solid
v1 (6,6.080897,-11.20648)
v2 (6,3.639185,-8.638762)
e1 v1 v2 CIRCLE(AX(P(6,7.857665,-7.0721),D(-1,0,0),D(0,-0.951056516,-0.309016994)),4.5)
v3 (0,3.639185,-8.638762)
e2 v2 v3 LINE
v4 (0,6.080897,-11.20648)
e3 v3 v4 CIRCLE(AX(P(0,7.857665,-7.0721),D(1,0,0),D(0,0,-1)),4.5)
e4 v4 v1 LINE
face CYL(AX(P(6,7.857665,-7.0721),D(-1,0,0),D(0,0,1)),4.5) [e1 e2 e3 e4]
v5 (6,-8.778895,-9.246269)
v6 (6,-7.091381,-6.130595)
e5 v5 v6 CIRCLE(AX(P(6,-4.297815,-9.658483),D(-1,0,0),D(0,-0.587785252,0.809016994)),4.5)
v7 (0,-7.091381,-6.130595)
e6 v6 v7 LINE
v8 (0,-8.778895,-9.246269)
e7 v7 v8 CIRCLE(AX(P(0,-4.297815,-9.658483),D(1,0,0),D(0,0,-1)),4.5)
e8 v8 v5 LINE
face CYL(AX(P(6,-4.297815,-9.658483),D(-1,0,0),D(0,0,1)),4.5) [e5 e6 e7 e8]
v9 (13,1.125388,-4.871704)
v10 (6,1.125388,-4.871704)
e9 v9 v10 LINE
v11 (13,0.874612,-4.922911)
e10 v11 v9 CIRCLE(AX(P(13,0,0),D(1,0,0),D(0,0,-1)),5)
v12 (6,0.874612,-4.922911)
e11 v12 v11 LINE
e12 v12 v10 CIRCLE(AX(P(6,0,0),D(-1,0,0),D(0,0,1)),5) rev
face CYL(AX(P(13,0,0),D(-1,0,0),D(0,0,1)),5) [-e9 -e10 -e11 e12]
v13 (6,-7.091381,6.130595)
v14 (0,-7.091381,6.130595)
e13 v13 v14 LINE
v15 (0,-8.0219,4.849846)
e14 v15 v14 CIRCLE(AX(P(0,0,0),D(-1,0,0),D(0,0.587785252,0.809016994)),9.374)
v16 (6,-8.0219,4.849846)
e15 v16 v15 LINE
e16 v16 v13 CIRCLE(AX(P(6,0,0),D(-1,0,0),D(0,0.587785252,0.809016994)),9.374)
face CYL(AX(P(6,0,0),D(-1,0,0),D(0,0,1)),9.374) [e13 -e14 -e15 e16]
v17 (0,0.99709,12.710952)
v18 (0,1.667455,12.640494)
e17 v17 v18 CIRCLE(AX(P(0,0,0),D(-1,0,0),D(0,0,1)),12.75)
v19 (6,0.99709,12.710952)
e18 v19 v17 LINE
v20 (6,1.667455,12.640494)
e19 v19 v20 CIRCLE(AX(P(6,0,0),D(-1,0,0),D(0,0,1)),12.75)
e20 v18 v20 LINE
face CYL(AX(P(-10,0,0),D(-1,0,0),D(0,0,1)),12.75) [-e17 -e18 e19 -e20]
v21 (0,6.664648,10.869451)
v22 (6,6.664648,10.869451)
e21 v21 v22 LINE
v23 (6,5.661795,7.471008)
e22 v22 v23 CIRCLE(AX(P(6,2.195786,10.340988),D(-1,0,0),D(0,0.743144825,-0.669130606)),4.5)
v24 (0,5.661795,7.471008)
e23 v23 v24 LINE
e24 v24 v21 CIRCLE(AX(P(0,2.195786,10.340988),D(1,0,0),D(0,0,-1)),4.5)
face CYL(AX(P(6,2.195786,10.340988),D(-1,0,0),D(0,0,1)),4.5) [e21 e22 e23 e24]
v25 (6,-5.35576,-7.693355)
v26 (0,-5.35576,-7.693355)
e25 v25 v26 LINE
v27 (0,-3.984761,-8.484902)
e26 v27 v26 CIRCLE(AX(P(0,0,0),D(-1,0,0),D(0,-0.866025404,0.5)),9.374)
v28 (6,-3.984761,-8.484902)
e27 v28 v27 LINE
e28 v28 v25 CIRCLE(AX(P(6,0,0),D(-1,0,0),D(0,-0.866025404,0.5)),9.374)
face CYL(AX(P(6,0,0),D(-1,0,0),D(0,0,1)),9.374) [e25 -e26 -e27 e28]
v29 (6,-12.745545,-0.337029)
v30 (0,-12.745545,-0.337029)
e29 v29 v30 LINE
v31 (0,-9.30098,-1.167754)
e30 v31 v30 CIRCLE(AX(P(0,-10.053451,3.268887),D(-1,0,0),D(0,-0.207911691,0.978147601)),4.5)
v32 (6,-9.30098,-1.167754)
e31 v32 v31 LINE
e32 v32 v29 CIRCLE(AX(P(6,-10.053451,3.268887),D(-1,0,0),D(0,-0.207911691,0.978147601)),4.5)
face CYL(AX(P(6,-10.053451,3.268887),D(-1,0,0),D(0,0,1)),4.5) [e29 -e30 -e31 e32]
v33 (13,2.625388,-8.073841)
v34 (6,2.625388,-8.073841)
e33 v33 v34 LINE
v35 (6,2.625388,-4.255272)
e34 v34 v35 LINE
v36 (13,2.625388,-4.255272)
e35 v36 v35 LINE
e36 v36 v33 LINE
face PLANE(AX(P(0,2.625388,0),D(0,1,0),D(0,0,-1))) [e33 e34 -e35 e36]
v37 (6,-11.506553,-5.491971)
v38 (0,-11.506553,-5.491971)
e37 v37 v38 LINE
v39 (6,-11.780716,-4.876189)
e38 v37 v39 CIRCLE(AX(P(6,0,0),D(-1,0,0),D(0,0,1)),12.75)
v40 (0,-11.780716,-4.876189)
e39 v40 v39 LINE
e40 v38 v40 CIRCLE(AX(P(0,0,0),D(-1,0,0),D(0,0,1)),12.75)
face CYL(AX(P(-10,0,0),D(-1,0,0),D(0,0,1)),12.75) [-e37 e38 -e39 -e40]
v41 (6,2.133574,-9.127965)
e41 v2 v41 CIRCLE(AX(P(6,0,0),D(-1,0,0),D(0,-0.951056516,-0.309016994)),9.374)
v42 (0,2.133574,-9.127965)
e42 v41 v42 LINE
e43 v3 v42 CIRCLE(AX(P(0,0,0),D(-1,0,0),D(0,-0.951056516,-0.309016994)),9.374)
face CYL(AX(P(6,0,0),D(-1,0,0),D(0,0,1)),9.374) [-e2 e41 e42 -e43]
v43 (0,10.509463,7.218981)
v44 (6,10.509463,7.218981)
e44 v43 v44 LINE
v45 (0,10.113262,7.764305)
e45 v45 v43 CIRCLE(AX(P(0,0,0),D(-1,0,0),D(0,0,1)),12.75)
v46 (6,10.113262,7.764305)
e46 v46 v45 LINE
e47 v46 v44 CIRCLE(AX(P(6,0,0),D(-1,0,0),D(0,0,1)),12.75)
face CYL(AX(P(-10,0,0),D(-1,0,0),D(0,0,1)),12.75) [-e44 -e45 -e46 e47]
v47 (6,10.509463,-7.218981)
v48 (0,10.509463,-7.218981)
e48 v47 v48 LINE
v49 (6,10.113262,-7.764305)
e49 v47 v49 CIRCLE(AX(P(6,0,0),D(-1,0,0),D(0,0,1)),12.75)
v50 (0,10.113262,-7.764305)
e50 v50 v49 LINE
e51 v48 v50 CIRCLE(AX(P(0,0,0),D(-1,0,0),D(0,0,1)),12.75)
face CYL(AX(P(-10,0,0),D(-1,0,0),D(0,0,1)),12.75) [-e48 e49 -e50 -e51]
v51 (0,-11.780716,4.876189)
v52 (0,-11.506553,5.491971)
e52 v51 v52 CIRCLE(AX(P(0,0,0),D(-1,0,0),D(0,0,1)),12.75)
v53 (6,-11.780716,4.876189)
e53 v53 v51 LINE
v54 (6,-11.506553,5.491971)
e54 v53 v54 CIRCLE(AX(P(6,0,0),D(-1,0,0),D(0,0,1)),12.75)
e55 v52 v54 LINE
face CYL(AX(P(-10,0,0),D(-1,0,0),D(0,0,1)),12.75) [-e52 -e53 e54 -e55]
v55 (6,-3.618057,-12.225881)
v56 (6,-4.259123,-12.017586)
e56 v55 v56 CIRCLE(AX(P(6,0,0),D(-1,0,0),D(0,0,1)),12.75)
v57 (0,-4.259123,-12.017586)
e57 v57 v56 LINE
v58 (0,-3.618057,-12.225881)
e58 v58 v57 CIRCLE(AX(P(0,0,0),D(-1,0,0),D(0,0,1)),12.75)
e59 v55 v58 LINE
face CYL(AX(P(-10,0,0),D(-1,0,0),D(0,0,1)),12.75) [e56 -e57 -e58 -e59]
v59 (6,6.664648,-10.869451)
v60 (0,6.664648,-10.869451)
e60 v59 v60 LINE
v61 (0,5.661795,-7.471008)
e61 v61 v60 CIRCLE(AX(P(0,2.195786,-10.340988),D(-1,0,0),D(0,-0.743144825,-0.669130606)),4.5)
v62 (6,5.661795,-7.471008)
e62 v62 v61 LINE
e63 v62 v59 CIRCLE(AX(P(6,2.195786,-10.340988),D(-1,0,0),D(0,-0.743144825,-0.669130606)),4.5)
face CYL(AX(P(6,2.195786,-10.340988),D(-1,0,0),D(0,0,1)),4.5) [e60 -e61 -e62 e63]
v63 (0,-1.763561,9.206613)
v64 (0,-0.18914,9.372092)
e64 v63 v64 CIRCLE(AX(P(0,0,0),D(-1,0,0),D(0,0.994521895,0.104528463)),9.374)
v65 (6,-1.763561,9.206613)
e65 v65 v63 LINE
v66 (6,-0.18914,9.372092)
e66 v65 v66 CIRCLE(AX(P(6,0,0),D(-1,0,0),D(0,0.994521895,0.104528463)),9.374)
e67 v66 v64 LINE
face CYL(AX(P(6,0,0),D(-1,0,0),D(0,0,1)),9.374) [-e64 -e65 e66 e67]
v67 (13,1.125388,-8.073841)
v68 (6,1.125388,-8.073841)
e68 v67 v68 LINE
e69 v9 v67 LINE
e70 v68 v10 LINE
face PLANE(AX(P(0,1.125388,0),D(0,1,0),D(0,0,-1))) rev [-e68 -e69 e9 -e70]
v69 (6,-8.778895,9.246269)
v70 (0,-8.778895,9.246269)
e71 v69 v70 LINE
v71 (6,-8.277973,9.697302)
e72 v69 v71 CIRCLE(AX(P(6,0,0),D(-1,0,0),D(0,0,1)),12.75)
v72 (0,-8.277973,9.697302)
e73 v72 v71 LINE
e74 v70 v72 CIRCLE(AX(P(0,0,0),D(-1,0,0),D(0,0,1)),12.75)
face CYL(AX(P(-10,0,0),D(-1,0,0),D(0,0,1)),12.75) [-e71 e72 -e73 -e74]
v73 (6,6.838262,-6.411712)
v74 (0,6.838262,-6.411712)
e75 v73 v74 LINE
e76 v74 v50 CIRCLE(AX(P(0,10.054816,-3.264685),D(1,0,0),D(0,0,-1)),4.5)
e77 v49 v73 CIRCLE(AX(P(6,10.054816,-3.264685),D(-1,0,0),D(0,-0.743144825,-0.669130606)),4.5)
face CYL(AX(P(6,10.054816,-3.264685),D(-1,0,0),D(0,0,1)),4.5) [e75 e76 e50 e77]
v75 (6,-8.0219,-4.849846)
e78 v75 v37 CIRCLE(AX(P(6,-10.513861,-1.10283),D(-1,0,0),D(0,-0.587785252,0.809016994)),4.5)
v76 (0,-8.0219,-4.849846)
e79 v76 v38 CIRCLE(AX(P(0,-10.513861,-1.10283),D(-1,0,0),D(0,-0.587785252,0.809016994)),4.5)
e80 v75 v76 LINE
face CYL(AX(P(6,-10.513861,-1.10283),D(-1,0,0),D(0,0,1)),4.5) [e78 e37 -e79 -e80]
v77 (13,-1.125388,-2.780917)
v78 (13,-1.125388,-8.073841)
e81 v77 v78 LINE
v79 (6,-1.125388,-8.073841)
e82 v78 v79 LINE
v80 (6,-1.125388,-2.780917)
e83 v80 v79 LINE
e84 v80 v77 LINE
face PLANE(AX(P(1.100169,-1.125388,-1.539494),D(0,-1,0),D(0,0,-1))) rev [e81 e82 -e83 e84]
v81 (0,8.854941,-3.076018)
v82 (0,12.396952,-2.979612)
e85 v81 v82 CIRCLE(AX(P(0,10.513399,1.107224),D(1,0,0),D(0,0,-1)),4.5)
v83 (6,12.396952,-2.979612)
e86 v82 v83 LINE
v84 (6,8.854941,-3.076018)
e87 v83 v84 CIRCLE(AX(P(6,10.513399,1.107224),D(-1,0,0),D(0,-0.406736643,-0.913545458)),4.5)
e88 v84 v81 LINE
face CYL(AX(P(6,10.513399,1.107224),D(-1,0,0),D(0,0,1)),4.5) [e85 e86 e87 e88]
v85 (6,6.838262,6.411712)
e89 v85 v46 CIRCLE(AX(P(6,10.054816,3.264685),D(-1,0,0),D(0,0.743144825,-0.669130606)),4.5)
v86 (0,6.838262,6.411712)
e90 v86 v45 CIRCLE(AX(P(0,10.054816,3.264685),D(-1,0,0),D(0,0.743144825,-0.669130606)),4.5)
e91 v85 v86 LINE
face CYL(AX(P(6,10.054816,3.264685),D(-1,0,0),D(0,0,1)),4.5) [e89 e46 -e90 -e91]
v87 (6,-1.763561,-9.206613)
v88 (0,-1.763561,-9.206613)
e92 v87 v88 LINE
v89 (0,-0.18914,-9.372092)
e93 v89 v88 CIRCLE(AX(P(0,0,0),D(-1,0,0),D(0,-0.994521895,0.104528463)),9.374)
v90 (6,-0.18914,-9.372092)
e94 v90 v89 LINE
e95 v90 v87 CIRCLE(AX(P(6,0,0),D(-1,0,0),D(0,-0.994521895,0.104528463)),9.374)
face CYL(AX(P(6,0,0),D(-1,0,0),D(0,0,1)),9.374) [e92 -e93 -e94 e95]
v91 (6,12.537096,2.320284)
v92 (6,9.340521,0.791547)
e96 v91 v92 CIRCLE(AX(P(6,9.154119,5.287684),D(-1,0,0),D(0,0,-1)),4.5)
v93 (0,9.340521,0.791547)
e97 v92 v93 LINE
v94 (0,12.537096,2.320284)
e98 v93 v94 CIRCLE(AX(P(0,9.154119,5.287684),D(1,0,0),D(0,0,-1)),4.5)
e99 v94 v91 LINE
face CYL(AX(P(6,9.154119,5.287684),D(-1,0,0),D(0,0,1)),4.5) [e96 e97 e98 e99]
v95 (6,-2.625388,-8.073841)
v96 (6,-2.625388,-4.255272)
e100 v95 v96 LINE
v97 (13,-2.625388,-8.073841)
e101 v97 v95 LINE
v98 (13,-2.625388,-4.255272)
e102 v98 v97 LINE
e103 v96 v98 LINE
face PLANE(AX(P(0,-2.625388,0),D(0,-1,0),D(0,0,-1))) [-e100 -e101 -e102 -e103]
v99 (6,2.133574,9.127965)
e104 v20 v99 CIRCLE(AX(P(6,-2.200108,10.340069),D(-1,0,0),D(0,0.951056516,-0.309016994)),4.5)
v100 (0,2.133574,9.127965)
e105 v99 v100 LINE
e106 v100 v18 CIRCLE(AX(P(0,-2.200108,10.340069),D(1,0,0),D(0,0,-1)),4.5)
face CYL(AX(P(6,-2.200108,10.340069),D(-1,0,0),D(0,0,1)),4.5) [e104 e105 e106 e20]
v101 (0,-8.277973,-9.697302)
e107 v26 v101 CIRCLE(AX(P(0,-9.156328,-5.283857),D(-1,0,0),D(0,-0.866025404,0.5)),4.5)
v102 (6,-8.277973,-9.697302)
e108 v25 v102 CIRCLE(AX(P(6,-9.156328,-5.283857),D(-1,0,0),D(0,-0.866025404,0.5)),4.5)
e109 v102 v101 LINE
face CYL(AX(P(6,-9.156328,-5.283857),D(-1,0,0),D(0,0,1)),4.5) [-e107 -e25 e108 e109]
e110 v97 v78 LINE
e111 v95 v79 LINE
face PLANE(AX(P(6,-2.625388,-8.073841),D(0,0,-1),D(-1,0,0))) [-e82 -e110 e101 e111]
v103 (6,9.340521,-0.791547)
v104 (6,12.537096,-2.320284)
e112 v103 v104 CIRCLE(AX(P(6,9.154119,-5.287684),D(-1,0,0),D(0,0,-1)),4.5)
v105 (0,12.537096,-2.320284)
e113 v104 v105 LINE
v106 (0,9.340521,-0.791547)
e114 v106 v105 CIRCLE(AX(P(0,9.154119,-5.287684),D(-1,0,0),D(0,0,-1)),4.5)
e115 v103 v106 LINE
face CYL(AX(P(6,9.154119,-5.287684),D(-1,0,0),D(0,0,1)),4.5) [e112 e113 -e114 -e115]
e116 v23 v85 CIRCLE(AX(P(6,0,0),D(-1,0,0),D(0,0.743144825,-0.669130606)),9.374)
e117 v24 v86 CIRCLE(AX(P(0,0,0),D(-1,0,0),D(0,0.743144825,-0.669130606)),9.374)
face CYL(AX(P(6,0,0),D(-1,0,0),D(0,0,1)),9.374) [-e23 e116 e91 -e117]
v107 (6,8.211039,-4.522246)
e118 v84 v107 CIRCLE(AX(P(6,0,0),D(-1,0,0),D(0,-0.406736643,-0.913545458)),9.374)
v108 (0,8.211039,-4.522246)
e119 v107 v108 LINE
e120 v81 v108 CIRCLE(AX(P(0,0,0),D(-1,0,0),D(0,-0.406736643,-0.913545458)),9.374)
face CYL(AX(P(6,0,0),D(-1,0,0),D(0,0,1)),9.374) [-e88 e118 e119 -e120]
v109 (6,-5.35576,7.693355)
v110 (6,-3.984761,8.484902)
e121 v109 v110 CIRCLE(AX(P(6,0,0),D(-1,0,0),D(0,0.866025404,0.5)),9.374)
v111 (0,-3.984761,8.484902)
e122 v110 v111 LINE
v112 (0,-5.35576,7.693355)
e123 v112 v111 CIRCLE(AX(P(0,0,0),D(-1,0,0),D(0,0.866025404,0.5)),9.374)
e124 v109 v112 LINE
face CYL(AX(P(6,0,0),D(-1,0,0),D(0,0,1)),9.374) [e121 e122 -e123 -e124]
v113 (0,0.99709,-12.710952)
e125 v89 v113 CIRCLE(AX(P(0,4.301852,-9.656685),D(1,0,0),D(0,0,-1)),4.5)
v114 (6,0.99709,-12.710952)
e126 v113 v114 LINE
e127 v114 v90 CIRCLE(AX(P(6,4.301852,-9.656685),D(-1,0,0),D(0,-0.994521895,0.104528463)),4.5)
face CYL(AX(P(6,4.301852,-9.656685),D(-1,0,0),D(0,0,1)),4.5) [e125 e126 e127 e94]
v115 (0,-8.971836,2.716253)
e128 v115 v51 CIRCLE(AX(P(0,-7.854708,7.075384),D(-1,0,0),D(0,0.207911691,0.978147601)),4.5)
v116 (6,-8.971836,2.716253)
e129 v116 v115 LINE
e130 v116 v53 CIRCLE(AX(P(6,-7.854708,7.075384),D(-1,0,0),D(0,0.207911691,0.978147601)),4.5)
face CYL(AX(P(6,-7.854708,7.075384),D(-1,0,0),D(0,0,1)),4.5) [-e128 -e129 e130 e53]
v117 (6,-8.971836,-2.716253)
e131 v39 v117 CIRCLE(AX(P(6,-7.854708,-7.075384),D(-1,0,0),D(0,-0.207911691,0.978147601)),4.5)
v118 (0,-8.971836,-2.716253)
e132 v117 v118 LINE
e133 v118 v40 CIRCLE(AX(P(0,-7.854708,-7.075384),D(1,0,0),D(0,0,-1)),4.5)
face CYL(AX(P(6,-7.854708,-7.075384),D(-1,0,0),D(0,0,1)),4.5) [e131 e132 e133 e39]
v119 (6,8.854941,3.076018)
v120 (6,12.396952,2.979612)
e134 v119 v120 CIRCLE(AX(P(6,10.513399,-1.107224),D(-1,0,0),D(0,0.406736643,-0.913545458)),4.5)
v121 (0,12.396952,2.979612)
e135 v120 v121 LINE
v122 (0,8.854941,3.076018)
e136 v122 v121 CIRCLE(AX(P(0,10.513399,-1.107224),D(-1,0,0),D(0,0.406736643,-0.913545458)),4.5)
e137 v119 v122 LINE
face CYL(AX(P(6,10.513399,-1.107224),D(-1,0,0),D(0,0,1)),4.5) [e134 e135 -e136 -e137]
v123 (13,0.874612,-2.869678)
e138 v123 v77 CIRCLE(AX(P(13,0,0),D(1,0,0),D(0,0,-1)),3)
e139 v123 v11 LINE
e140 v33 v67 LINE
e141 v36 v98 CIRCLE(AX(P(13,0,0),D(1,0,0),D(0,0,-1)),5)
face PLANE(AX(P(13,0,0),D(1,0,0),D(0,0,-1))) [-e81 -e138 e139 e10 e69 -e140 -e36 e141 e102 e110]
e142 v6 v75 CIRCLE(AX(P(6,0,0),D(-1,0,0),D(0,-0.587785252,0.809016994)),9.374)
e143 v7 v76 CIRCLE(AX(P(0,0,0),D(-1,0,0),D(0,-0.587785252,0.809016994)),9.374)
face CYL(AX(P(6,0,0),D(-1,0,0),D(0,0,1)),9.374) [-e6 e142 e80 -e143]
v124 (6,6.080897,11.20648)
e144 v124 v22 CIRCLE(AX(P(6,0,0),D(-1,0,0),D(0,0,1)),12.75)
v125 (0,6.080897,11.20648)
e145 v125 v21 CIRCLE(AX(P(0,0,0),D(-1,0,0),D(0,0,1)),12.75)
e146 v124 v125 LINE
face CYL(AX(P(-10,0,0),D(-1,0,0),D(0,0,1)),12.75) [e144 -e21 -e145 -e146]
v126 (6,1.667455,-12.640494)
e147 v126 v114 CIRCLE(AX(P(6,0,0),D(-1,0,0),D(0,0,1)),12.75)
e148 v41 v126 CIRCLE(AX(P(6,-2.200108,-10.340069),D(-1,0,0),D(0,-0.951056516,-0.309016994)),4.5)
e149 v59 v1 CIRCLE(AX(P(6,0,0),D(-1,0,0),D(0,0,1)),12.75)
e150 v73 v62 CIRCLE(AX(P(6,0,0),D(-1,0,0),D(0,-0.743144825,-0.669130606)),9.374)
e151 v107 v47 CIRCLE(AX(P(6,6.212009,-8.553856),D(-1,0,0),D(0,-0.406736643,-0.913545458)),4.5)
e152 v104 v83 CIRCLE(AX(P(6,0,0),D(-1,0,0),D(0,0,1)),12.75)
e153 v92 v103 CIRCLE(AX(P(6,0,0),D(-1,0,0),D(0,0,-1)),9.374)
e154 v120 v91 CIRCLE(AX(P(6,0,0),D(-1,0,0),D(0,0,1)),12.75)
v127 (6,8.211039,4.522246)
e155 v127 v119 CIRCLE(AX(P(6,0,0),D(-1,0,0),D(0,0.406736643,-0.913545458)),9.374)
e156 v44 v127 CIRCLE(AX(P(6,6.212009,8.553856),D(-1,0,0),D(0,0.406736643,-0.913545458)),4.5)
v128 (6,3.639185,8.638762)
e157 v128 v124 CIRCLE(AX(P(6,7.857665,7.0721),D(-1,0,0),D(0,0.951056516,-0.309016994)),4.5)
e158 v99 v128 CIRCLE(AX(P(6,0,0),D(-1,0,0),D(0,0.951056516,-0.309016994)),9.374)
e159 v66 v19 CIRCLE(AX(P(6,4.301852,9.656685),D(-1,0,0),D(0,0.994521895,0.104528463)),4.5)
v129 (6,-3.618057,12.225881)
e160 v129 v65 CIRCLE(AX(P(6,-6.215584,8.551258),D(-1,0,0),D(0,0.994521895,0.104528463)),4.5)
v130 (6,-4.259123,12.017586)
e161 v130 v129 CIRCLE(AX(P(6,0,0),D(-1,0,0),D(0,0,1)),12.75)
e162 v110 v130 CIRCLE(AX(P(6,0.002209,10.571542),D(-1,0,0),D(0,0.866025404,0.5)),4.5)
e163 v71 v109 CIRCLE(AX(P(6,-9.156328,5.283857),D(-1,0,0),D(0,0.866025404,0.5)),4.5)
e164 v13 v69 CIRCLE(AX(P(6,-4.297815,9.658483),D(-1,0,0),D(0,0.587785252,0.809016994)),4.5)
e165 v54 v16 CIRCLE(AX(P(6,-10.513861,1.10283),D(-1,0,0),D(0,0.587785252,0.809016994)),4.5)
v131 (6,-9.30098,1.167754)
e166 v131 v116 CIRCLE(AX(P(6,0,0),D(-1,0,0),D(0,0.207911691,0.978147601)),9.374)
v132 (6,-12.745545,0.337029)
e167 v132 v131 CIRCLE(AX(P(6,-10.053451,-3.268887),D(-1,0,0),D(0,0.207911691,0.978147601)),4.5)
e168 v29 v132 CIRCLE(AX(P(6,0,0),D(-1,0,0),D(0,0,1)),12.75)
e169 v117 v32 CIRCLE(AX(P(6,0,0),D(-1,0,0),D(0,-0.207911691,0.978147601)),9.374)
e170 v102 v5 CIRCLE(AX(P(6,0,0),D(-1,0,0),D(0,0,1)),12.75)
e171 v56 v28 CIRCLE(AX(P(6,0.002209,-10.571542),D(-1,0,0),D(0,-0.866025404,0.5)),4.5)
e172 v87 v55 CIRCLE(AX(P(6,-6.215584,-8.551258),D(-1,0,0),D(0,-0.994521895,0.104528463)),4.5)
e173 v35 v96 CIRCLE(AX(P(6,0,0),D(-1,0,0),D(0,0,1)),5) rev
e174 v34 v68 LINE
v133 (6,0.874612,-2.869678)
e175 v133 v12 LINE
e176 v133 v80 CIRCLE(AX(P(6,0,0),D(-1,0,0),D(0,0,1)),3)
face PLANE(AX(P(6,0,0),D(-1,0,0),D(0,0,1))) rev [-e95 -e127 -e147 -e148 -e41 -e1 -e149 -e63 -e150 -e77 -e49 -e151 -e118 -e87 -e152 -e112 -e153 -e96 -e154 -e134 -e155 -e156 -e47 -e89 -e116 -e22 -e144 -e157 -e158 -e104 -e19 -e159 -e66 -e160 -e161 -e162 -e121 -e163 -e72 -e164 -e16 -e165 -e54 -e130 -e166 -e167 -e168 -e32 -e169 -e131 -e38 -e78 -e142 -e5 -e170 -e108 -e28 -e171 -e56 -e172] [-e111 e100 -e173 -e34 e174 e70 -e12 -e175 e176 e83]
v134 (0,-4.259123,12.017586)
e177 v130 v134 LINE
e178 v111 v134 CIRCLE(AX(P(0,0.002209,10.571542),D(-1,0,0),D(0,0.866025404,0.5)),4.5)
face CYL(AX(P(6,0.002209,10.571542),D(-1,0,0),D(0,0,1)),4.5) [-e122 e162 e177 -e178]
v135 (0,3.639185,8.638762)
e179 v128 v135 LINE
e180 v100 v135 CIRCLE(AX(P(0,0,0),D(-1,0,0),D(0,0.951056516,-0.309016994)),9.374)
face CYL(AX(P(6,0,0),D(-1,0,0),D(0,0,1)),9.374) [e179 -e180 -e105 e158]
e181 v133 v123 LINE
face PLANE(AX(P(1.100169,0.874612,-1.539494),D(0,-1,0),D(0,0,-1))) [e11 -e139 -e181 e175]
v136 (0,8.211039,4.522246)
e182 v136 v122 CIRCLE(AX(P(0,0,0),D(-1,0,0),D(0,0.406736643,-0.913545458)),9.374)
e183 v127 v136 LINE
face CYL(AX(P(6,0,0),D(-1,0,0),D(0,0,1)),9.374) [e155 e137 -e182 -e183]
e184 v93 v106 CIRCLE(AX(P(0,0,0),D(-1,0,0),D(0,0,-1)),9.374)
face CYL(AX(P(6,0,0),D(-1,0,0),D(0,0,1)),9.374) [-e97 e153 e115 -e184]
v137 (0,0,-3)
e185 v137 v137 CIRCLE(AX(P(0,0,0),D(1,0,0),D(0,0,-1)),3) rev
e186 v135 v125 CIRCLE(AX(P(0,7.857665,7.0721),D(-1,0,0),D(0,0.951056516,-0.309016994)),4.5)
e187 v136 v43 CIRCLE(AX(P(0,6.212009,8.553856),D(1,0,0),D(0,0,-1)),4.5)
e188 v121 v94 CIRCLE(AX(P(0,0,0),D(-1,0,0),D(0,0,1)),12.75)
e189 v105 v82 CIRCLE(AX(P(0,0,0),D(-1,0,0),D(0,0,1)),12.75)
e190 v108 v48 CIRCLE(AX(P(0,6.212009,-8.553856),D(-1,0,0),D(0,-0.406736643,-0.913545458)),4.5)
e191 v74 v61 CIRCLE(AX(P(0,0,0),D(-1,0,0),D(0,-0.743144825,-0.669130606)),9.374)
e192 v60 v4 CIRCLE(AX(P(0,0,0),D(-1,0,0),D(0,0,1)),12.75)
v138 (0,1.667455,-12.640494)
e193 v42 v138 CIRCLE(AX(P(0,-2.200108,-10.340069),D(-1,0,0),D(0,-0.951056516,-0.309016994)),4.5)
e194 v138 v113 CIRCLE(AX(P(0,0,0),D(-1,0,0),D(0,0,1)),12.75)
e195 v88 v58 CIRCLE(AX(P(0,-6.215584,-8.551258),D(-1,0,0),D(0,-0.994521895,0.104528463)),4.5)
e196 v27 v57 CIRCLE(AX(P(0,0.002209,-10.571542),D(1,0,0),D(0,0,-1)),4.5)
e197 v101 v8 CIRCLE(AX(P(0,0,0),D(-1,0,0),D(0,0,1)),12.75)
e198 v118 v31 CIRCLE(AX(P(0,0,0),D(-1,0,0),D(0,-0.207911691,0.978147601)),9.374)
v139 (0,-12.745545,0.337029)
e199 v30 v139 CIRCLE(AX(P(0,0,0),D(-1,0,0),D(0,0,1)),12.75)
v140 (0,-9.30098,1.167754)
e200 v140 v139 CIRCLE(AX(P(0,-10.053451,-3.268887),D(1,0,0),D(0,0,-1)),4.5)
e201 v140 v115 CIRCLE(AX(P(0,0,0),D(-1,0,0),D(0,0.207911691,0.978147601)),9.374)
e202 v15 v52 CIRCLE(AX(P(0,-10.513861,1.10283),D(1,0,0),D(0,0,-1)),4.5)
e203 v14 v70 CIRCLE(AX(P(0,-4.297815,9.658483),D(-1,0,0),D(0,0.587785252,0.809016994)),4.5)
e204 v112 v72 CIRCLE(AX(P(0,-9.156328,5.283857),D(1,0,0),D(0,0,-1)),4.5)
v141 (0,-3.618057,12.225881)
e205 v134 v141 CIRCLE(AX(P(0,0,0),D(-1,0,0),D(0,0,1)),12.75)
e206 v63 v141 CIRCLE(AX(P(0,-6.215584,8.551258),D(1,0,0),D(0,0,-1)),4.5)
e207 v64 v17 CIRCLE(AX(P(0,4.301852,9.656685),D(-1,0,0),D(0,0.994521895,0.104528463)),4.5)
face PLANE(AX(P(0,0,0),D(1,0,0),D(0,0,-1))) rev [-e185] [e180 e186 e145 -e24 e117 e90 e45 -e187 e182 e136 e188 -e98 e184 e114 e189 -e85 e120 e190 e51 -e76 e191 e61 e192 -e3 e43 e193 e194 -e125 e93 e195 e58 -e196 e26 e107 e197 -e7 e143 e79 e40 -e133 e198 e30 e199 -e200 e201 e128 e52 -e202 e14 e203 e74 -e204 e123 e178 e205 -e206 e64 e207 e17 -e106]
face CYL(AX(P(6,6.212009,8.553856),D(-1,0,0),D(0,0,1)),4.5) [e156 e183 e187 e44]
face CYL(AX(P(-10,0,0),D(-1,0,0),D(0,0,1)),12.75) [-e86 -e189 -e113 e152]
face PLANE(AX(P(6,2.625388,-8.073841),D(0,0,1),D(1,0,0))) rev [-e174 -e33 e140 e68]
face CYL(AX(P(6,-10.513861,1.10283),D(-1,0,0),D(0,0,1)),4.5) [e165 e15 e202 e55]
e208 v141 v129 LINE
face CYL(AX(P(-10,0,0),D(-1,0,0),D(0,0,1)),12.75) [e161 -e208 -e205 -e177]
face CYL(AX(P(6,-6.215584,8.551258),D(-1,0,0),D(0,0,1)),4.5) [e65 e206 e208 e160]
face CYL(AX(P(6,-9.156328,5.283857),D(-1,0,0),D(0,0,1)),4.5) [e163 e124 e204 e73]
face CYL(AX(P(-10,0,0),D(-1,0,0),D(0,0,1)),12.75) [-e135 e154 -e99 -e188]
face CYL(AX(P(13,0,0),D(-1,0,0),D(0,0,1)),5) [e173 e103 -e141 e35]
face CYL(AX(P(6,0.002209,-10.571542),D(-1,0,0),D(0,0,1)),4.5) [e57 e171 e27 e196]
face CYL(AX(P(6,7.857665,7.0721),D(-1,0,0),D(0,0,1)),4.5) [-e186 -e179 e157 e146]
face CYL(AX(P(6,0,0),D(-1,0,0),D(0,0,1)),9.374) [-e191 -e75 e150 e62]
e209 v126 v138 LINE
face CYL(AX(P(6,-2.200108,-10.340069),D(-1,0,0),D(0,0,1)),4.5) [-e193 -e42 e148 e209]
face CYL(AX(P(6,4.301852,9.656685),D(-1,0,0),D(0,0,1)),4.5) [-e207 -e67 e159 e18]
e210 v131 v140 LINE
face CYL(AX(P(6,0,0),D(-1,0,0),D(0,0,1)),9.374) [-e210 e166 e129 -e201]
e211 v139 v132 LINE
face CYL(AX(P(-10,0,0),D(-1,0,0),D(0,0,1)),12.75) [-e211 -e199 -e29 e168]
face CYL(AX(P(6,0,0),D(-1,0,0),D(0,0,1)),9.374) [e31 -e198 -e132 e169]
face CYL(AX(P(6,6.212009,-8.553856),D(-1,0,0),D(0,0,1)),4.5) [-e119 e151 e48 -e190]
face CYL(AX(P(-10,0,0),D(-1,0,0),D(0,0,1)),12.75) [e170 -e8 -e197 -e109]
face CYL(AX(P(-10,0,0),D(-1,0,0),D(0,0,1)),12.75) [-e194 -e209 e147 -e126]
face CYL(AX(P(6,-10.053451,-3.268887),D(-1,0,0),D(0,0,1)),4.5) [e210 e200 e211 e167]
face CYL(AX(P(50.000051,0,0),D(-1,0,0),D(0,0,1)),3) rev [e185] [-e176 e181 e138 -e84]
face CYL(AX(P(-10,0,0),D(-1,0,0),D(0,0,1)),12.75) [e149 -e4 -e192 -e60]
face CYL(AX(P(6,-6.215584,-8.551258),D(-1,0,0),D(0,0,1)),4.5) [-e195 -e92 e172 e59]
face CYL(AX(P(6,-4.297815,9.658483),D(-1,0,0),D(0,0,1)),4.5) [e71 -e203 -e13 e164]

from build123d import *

# Parameters (mm, degrees)
BASPROSKE_W         = 6
BASPROSKE_H         = 12.75
TOOTHCUT_DEPTH      = 20.003289189
TEETHCUTS_COUNT     = 15
TEETHCUTS_ANGLE     = 336
BORSKE_R            = 3
BORE_DEPTH          = 50.0000508
BOSS_EXTRUDE1_START = 7
SKETCH1_R           = 5
SKETCH1_R_2         = 3
BOSS_EXTRUDE1_DEPTH = 7
CUT_EXTRUDE1_START  = -7
CUT_EXTRUDE1_DEPTH  = 7
SKETCH3_W           = 7
SKETCH3_H           = 5.292923502
BOSS_EXTRUDE2_DEPTH = 1.5


# Read off the part's stored shape, not the designer's step: Cut-Extrude1
with BuildPart() as part:
    # BasProSke → Base-Revolve (revolve)
    with BuildSketch(Plane(origin=(0, 0, 0), x_dir=(1, 0, 0), z_dir=(0, 1, 0)), mode=Mode.PRIVATE) as base_revolve_sk:
        with Locations((3, 6.375)):
            Rectangle(BASPROSKE_W, BASPROSKE_H)
    revolve(base_revolve_sk.sketch.rotate(Axis((-10, 0, 0), (1, 0, 0)), 180), axis=Axis((-10, 0, 0), (1, 0, 0)))

    # TooCutSke → ToothCut (cut, through all)
    with BuildSketch(Plane(origin=(0, 0, 0), x_dir=(0, 0, -1), z_dir=(1, 0, 0))):
        with BuildLine():
            ThreePointArc((0.791546546, 9.340520867), (0, 9.374), (-0.791546546, 9.340520867))
            ThreePointArc((-0.791546546, 9.340520867), (-1.235070734, 11.110218102), (-2.344732916, 12.558386549))
            ThreePointArc((-2.344732916, 12.558386549), (0, 12.7754), (2.344732916, 12.558386549))
            ThreePointArc((2.344732916, 12.558386549), (1.235070734, 11.110218102), (0.791546546, 9.340520867))
        make_face()
    toothcut = extrude(amount=TOOTHCUT_DEPTH, mode=Mode.SUBTRACT)

    # TeethCuts: ToothCut ×15 about axis
    teethcuts_axis = Axis((-10, 0, 0), (1, 0, 0))
    for i in range(1, TEETHCUTS_COUNT):
        add(toothcut.rotate(teethcuts_axis, i * TEETHCUTS_ANGLE / (TEETHCUTS_COUNT - 1)), mode=Mode.SUBTRACT)

    # BorSke → Bore (cut, symmetric)
    with BuildSketch(Plane(origin=(0, 0, 0), x_dir=(0, 0, -1), z_dir=(1, 0, 0))):
        with Locations(Location((0, 0, 0), (0, 0, 180))):
            Circle(BORSKE_R)
    extrude(amount=BORE_DEPTH, both=True, mode=Mode.SUBTRACT)

    # Sketch1 → Boss-Extrude1 (add)
    with BuildSketch(Plane(origin=(6, 0, 0), x_dir=(0, 0, -1), z_dir=(1, 0, 0)).offset(BOSS_EXTRUDE1_START)):
        with Locations(Location((0, 0, 0), (0, 0, 180))):
            Circle(SKETCH1_R)
        Circle(SKETCH1_R_2, mode=Mode.SUBTRACT)
    extrude(amount=-BOSS_EXTRUDE1_DEPTH)

    # Cut-Extrude1 outline → Cut-Extrude1 (cut)
    with BuildSketch(Plane(origin=(13, 0, 0), x_dir=(0, 0, -1), z_dir=(1, 0, 0)).offset(CUT_EXTRUDE1_START)):
        with BuildLine():
            ThreePointArc((2.869678463, 0.874611639), (2.997049903, -0.133010816), (2.780917301, -1.125388361))
            Line((2.780917301, -1.125388361), (4.87170412, -1.125388361))
            ThreePointArc((4.87170412, -1.125388361), (4.998361954, -0.127975708), (4.922911179, 0.874611639))
            Line((4.922911179, 0.874611639), (2.869678463, 0.874611639))
        make_face()
    extrude(amount=CUT_EXTRUDE1_DEPTH, mode=Mode.SUBTRACT)

    # Sketch3 → Boss-Extrude2 (add)
    with BuildSketch(Plane(origin=(0, -1.125388361, 0), x_dir=(1, 0, 0), z_dir=(0, 1, 0))):
        with Locations((9.5, 5.427379052)):
            Rectangle(SKETCH3_W, SKETCH3_H)
    boss_extrude2 = extrude(amount=-BOSS_EXTRUDE2_DEPTH)

    # Mirror2: Boss-Extrude2 across plane
    add(boss_extrude2.mirror(Plane.ZX))


solid = part.part
